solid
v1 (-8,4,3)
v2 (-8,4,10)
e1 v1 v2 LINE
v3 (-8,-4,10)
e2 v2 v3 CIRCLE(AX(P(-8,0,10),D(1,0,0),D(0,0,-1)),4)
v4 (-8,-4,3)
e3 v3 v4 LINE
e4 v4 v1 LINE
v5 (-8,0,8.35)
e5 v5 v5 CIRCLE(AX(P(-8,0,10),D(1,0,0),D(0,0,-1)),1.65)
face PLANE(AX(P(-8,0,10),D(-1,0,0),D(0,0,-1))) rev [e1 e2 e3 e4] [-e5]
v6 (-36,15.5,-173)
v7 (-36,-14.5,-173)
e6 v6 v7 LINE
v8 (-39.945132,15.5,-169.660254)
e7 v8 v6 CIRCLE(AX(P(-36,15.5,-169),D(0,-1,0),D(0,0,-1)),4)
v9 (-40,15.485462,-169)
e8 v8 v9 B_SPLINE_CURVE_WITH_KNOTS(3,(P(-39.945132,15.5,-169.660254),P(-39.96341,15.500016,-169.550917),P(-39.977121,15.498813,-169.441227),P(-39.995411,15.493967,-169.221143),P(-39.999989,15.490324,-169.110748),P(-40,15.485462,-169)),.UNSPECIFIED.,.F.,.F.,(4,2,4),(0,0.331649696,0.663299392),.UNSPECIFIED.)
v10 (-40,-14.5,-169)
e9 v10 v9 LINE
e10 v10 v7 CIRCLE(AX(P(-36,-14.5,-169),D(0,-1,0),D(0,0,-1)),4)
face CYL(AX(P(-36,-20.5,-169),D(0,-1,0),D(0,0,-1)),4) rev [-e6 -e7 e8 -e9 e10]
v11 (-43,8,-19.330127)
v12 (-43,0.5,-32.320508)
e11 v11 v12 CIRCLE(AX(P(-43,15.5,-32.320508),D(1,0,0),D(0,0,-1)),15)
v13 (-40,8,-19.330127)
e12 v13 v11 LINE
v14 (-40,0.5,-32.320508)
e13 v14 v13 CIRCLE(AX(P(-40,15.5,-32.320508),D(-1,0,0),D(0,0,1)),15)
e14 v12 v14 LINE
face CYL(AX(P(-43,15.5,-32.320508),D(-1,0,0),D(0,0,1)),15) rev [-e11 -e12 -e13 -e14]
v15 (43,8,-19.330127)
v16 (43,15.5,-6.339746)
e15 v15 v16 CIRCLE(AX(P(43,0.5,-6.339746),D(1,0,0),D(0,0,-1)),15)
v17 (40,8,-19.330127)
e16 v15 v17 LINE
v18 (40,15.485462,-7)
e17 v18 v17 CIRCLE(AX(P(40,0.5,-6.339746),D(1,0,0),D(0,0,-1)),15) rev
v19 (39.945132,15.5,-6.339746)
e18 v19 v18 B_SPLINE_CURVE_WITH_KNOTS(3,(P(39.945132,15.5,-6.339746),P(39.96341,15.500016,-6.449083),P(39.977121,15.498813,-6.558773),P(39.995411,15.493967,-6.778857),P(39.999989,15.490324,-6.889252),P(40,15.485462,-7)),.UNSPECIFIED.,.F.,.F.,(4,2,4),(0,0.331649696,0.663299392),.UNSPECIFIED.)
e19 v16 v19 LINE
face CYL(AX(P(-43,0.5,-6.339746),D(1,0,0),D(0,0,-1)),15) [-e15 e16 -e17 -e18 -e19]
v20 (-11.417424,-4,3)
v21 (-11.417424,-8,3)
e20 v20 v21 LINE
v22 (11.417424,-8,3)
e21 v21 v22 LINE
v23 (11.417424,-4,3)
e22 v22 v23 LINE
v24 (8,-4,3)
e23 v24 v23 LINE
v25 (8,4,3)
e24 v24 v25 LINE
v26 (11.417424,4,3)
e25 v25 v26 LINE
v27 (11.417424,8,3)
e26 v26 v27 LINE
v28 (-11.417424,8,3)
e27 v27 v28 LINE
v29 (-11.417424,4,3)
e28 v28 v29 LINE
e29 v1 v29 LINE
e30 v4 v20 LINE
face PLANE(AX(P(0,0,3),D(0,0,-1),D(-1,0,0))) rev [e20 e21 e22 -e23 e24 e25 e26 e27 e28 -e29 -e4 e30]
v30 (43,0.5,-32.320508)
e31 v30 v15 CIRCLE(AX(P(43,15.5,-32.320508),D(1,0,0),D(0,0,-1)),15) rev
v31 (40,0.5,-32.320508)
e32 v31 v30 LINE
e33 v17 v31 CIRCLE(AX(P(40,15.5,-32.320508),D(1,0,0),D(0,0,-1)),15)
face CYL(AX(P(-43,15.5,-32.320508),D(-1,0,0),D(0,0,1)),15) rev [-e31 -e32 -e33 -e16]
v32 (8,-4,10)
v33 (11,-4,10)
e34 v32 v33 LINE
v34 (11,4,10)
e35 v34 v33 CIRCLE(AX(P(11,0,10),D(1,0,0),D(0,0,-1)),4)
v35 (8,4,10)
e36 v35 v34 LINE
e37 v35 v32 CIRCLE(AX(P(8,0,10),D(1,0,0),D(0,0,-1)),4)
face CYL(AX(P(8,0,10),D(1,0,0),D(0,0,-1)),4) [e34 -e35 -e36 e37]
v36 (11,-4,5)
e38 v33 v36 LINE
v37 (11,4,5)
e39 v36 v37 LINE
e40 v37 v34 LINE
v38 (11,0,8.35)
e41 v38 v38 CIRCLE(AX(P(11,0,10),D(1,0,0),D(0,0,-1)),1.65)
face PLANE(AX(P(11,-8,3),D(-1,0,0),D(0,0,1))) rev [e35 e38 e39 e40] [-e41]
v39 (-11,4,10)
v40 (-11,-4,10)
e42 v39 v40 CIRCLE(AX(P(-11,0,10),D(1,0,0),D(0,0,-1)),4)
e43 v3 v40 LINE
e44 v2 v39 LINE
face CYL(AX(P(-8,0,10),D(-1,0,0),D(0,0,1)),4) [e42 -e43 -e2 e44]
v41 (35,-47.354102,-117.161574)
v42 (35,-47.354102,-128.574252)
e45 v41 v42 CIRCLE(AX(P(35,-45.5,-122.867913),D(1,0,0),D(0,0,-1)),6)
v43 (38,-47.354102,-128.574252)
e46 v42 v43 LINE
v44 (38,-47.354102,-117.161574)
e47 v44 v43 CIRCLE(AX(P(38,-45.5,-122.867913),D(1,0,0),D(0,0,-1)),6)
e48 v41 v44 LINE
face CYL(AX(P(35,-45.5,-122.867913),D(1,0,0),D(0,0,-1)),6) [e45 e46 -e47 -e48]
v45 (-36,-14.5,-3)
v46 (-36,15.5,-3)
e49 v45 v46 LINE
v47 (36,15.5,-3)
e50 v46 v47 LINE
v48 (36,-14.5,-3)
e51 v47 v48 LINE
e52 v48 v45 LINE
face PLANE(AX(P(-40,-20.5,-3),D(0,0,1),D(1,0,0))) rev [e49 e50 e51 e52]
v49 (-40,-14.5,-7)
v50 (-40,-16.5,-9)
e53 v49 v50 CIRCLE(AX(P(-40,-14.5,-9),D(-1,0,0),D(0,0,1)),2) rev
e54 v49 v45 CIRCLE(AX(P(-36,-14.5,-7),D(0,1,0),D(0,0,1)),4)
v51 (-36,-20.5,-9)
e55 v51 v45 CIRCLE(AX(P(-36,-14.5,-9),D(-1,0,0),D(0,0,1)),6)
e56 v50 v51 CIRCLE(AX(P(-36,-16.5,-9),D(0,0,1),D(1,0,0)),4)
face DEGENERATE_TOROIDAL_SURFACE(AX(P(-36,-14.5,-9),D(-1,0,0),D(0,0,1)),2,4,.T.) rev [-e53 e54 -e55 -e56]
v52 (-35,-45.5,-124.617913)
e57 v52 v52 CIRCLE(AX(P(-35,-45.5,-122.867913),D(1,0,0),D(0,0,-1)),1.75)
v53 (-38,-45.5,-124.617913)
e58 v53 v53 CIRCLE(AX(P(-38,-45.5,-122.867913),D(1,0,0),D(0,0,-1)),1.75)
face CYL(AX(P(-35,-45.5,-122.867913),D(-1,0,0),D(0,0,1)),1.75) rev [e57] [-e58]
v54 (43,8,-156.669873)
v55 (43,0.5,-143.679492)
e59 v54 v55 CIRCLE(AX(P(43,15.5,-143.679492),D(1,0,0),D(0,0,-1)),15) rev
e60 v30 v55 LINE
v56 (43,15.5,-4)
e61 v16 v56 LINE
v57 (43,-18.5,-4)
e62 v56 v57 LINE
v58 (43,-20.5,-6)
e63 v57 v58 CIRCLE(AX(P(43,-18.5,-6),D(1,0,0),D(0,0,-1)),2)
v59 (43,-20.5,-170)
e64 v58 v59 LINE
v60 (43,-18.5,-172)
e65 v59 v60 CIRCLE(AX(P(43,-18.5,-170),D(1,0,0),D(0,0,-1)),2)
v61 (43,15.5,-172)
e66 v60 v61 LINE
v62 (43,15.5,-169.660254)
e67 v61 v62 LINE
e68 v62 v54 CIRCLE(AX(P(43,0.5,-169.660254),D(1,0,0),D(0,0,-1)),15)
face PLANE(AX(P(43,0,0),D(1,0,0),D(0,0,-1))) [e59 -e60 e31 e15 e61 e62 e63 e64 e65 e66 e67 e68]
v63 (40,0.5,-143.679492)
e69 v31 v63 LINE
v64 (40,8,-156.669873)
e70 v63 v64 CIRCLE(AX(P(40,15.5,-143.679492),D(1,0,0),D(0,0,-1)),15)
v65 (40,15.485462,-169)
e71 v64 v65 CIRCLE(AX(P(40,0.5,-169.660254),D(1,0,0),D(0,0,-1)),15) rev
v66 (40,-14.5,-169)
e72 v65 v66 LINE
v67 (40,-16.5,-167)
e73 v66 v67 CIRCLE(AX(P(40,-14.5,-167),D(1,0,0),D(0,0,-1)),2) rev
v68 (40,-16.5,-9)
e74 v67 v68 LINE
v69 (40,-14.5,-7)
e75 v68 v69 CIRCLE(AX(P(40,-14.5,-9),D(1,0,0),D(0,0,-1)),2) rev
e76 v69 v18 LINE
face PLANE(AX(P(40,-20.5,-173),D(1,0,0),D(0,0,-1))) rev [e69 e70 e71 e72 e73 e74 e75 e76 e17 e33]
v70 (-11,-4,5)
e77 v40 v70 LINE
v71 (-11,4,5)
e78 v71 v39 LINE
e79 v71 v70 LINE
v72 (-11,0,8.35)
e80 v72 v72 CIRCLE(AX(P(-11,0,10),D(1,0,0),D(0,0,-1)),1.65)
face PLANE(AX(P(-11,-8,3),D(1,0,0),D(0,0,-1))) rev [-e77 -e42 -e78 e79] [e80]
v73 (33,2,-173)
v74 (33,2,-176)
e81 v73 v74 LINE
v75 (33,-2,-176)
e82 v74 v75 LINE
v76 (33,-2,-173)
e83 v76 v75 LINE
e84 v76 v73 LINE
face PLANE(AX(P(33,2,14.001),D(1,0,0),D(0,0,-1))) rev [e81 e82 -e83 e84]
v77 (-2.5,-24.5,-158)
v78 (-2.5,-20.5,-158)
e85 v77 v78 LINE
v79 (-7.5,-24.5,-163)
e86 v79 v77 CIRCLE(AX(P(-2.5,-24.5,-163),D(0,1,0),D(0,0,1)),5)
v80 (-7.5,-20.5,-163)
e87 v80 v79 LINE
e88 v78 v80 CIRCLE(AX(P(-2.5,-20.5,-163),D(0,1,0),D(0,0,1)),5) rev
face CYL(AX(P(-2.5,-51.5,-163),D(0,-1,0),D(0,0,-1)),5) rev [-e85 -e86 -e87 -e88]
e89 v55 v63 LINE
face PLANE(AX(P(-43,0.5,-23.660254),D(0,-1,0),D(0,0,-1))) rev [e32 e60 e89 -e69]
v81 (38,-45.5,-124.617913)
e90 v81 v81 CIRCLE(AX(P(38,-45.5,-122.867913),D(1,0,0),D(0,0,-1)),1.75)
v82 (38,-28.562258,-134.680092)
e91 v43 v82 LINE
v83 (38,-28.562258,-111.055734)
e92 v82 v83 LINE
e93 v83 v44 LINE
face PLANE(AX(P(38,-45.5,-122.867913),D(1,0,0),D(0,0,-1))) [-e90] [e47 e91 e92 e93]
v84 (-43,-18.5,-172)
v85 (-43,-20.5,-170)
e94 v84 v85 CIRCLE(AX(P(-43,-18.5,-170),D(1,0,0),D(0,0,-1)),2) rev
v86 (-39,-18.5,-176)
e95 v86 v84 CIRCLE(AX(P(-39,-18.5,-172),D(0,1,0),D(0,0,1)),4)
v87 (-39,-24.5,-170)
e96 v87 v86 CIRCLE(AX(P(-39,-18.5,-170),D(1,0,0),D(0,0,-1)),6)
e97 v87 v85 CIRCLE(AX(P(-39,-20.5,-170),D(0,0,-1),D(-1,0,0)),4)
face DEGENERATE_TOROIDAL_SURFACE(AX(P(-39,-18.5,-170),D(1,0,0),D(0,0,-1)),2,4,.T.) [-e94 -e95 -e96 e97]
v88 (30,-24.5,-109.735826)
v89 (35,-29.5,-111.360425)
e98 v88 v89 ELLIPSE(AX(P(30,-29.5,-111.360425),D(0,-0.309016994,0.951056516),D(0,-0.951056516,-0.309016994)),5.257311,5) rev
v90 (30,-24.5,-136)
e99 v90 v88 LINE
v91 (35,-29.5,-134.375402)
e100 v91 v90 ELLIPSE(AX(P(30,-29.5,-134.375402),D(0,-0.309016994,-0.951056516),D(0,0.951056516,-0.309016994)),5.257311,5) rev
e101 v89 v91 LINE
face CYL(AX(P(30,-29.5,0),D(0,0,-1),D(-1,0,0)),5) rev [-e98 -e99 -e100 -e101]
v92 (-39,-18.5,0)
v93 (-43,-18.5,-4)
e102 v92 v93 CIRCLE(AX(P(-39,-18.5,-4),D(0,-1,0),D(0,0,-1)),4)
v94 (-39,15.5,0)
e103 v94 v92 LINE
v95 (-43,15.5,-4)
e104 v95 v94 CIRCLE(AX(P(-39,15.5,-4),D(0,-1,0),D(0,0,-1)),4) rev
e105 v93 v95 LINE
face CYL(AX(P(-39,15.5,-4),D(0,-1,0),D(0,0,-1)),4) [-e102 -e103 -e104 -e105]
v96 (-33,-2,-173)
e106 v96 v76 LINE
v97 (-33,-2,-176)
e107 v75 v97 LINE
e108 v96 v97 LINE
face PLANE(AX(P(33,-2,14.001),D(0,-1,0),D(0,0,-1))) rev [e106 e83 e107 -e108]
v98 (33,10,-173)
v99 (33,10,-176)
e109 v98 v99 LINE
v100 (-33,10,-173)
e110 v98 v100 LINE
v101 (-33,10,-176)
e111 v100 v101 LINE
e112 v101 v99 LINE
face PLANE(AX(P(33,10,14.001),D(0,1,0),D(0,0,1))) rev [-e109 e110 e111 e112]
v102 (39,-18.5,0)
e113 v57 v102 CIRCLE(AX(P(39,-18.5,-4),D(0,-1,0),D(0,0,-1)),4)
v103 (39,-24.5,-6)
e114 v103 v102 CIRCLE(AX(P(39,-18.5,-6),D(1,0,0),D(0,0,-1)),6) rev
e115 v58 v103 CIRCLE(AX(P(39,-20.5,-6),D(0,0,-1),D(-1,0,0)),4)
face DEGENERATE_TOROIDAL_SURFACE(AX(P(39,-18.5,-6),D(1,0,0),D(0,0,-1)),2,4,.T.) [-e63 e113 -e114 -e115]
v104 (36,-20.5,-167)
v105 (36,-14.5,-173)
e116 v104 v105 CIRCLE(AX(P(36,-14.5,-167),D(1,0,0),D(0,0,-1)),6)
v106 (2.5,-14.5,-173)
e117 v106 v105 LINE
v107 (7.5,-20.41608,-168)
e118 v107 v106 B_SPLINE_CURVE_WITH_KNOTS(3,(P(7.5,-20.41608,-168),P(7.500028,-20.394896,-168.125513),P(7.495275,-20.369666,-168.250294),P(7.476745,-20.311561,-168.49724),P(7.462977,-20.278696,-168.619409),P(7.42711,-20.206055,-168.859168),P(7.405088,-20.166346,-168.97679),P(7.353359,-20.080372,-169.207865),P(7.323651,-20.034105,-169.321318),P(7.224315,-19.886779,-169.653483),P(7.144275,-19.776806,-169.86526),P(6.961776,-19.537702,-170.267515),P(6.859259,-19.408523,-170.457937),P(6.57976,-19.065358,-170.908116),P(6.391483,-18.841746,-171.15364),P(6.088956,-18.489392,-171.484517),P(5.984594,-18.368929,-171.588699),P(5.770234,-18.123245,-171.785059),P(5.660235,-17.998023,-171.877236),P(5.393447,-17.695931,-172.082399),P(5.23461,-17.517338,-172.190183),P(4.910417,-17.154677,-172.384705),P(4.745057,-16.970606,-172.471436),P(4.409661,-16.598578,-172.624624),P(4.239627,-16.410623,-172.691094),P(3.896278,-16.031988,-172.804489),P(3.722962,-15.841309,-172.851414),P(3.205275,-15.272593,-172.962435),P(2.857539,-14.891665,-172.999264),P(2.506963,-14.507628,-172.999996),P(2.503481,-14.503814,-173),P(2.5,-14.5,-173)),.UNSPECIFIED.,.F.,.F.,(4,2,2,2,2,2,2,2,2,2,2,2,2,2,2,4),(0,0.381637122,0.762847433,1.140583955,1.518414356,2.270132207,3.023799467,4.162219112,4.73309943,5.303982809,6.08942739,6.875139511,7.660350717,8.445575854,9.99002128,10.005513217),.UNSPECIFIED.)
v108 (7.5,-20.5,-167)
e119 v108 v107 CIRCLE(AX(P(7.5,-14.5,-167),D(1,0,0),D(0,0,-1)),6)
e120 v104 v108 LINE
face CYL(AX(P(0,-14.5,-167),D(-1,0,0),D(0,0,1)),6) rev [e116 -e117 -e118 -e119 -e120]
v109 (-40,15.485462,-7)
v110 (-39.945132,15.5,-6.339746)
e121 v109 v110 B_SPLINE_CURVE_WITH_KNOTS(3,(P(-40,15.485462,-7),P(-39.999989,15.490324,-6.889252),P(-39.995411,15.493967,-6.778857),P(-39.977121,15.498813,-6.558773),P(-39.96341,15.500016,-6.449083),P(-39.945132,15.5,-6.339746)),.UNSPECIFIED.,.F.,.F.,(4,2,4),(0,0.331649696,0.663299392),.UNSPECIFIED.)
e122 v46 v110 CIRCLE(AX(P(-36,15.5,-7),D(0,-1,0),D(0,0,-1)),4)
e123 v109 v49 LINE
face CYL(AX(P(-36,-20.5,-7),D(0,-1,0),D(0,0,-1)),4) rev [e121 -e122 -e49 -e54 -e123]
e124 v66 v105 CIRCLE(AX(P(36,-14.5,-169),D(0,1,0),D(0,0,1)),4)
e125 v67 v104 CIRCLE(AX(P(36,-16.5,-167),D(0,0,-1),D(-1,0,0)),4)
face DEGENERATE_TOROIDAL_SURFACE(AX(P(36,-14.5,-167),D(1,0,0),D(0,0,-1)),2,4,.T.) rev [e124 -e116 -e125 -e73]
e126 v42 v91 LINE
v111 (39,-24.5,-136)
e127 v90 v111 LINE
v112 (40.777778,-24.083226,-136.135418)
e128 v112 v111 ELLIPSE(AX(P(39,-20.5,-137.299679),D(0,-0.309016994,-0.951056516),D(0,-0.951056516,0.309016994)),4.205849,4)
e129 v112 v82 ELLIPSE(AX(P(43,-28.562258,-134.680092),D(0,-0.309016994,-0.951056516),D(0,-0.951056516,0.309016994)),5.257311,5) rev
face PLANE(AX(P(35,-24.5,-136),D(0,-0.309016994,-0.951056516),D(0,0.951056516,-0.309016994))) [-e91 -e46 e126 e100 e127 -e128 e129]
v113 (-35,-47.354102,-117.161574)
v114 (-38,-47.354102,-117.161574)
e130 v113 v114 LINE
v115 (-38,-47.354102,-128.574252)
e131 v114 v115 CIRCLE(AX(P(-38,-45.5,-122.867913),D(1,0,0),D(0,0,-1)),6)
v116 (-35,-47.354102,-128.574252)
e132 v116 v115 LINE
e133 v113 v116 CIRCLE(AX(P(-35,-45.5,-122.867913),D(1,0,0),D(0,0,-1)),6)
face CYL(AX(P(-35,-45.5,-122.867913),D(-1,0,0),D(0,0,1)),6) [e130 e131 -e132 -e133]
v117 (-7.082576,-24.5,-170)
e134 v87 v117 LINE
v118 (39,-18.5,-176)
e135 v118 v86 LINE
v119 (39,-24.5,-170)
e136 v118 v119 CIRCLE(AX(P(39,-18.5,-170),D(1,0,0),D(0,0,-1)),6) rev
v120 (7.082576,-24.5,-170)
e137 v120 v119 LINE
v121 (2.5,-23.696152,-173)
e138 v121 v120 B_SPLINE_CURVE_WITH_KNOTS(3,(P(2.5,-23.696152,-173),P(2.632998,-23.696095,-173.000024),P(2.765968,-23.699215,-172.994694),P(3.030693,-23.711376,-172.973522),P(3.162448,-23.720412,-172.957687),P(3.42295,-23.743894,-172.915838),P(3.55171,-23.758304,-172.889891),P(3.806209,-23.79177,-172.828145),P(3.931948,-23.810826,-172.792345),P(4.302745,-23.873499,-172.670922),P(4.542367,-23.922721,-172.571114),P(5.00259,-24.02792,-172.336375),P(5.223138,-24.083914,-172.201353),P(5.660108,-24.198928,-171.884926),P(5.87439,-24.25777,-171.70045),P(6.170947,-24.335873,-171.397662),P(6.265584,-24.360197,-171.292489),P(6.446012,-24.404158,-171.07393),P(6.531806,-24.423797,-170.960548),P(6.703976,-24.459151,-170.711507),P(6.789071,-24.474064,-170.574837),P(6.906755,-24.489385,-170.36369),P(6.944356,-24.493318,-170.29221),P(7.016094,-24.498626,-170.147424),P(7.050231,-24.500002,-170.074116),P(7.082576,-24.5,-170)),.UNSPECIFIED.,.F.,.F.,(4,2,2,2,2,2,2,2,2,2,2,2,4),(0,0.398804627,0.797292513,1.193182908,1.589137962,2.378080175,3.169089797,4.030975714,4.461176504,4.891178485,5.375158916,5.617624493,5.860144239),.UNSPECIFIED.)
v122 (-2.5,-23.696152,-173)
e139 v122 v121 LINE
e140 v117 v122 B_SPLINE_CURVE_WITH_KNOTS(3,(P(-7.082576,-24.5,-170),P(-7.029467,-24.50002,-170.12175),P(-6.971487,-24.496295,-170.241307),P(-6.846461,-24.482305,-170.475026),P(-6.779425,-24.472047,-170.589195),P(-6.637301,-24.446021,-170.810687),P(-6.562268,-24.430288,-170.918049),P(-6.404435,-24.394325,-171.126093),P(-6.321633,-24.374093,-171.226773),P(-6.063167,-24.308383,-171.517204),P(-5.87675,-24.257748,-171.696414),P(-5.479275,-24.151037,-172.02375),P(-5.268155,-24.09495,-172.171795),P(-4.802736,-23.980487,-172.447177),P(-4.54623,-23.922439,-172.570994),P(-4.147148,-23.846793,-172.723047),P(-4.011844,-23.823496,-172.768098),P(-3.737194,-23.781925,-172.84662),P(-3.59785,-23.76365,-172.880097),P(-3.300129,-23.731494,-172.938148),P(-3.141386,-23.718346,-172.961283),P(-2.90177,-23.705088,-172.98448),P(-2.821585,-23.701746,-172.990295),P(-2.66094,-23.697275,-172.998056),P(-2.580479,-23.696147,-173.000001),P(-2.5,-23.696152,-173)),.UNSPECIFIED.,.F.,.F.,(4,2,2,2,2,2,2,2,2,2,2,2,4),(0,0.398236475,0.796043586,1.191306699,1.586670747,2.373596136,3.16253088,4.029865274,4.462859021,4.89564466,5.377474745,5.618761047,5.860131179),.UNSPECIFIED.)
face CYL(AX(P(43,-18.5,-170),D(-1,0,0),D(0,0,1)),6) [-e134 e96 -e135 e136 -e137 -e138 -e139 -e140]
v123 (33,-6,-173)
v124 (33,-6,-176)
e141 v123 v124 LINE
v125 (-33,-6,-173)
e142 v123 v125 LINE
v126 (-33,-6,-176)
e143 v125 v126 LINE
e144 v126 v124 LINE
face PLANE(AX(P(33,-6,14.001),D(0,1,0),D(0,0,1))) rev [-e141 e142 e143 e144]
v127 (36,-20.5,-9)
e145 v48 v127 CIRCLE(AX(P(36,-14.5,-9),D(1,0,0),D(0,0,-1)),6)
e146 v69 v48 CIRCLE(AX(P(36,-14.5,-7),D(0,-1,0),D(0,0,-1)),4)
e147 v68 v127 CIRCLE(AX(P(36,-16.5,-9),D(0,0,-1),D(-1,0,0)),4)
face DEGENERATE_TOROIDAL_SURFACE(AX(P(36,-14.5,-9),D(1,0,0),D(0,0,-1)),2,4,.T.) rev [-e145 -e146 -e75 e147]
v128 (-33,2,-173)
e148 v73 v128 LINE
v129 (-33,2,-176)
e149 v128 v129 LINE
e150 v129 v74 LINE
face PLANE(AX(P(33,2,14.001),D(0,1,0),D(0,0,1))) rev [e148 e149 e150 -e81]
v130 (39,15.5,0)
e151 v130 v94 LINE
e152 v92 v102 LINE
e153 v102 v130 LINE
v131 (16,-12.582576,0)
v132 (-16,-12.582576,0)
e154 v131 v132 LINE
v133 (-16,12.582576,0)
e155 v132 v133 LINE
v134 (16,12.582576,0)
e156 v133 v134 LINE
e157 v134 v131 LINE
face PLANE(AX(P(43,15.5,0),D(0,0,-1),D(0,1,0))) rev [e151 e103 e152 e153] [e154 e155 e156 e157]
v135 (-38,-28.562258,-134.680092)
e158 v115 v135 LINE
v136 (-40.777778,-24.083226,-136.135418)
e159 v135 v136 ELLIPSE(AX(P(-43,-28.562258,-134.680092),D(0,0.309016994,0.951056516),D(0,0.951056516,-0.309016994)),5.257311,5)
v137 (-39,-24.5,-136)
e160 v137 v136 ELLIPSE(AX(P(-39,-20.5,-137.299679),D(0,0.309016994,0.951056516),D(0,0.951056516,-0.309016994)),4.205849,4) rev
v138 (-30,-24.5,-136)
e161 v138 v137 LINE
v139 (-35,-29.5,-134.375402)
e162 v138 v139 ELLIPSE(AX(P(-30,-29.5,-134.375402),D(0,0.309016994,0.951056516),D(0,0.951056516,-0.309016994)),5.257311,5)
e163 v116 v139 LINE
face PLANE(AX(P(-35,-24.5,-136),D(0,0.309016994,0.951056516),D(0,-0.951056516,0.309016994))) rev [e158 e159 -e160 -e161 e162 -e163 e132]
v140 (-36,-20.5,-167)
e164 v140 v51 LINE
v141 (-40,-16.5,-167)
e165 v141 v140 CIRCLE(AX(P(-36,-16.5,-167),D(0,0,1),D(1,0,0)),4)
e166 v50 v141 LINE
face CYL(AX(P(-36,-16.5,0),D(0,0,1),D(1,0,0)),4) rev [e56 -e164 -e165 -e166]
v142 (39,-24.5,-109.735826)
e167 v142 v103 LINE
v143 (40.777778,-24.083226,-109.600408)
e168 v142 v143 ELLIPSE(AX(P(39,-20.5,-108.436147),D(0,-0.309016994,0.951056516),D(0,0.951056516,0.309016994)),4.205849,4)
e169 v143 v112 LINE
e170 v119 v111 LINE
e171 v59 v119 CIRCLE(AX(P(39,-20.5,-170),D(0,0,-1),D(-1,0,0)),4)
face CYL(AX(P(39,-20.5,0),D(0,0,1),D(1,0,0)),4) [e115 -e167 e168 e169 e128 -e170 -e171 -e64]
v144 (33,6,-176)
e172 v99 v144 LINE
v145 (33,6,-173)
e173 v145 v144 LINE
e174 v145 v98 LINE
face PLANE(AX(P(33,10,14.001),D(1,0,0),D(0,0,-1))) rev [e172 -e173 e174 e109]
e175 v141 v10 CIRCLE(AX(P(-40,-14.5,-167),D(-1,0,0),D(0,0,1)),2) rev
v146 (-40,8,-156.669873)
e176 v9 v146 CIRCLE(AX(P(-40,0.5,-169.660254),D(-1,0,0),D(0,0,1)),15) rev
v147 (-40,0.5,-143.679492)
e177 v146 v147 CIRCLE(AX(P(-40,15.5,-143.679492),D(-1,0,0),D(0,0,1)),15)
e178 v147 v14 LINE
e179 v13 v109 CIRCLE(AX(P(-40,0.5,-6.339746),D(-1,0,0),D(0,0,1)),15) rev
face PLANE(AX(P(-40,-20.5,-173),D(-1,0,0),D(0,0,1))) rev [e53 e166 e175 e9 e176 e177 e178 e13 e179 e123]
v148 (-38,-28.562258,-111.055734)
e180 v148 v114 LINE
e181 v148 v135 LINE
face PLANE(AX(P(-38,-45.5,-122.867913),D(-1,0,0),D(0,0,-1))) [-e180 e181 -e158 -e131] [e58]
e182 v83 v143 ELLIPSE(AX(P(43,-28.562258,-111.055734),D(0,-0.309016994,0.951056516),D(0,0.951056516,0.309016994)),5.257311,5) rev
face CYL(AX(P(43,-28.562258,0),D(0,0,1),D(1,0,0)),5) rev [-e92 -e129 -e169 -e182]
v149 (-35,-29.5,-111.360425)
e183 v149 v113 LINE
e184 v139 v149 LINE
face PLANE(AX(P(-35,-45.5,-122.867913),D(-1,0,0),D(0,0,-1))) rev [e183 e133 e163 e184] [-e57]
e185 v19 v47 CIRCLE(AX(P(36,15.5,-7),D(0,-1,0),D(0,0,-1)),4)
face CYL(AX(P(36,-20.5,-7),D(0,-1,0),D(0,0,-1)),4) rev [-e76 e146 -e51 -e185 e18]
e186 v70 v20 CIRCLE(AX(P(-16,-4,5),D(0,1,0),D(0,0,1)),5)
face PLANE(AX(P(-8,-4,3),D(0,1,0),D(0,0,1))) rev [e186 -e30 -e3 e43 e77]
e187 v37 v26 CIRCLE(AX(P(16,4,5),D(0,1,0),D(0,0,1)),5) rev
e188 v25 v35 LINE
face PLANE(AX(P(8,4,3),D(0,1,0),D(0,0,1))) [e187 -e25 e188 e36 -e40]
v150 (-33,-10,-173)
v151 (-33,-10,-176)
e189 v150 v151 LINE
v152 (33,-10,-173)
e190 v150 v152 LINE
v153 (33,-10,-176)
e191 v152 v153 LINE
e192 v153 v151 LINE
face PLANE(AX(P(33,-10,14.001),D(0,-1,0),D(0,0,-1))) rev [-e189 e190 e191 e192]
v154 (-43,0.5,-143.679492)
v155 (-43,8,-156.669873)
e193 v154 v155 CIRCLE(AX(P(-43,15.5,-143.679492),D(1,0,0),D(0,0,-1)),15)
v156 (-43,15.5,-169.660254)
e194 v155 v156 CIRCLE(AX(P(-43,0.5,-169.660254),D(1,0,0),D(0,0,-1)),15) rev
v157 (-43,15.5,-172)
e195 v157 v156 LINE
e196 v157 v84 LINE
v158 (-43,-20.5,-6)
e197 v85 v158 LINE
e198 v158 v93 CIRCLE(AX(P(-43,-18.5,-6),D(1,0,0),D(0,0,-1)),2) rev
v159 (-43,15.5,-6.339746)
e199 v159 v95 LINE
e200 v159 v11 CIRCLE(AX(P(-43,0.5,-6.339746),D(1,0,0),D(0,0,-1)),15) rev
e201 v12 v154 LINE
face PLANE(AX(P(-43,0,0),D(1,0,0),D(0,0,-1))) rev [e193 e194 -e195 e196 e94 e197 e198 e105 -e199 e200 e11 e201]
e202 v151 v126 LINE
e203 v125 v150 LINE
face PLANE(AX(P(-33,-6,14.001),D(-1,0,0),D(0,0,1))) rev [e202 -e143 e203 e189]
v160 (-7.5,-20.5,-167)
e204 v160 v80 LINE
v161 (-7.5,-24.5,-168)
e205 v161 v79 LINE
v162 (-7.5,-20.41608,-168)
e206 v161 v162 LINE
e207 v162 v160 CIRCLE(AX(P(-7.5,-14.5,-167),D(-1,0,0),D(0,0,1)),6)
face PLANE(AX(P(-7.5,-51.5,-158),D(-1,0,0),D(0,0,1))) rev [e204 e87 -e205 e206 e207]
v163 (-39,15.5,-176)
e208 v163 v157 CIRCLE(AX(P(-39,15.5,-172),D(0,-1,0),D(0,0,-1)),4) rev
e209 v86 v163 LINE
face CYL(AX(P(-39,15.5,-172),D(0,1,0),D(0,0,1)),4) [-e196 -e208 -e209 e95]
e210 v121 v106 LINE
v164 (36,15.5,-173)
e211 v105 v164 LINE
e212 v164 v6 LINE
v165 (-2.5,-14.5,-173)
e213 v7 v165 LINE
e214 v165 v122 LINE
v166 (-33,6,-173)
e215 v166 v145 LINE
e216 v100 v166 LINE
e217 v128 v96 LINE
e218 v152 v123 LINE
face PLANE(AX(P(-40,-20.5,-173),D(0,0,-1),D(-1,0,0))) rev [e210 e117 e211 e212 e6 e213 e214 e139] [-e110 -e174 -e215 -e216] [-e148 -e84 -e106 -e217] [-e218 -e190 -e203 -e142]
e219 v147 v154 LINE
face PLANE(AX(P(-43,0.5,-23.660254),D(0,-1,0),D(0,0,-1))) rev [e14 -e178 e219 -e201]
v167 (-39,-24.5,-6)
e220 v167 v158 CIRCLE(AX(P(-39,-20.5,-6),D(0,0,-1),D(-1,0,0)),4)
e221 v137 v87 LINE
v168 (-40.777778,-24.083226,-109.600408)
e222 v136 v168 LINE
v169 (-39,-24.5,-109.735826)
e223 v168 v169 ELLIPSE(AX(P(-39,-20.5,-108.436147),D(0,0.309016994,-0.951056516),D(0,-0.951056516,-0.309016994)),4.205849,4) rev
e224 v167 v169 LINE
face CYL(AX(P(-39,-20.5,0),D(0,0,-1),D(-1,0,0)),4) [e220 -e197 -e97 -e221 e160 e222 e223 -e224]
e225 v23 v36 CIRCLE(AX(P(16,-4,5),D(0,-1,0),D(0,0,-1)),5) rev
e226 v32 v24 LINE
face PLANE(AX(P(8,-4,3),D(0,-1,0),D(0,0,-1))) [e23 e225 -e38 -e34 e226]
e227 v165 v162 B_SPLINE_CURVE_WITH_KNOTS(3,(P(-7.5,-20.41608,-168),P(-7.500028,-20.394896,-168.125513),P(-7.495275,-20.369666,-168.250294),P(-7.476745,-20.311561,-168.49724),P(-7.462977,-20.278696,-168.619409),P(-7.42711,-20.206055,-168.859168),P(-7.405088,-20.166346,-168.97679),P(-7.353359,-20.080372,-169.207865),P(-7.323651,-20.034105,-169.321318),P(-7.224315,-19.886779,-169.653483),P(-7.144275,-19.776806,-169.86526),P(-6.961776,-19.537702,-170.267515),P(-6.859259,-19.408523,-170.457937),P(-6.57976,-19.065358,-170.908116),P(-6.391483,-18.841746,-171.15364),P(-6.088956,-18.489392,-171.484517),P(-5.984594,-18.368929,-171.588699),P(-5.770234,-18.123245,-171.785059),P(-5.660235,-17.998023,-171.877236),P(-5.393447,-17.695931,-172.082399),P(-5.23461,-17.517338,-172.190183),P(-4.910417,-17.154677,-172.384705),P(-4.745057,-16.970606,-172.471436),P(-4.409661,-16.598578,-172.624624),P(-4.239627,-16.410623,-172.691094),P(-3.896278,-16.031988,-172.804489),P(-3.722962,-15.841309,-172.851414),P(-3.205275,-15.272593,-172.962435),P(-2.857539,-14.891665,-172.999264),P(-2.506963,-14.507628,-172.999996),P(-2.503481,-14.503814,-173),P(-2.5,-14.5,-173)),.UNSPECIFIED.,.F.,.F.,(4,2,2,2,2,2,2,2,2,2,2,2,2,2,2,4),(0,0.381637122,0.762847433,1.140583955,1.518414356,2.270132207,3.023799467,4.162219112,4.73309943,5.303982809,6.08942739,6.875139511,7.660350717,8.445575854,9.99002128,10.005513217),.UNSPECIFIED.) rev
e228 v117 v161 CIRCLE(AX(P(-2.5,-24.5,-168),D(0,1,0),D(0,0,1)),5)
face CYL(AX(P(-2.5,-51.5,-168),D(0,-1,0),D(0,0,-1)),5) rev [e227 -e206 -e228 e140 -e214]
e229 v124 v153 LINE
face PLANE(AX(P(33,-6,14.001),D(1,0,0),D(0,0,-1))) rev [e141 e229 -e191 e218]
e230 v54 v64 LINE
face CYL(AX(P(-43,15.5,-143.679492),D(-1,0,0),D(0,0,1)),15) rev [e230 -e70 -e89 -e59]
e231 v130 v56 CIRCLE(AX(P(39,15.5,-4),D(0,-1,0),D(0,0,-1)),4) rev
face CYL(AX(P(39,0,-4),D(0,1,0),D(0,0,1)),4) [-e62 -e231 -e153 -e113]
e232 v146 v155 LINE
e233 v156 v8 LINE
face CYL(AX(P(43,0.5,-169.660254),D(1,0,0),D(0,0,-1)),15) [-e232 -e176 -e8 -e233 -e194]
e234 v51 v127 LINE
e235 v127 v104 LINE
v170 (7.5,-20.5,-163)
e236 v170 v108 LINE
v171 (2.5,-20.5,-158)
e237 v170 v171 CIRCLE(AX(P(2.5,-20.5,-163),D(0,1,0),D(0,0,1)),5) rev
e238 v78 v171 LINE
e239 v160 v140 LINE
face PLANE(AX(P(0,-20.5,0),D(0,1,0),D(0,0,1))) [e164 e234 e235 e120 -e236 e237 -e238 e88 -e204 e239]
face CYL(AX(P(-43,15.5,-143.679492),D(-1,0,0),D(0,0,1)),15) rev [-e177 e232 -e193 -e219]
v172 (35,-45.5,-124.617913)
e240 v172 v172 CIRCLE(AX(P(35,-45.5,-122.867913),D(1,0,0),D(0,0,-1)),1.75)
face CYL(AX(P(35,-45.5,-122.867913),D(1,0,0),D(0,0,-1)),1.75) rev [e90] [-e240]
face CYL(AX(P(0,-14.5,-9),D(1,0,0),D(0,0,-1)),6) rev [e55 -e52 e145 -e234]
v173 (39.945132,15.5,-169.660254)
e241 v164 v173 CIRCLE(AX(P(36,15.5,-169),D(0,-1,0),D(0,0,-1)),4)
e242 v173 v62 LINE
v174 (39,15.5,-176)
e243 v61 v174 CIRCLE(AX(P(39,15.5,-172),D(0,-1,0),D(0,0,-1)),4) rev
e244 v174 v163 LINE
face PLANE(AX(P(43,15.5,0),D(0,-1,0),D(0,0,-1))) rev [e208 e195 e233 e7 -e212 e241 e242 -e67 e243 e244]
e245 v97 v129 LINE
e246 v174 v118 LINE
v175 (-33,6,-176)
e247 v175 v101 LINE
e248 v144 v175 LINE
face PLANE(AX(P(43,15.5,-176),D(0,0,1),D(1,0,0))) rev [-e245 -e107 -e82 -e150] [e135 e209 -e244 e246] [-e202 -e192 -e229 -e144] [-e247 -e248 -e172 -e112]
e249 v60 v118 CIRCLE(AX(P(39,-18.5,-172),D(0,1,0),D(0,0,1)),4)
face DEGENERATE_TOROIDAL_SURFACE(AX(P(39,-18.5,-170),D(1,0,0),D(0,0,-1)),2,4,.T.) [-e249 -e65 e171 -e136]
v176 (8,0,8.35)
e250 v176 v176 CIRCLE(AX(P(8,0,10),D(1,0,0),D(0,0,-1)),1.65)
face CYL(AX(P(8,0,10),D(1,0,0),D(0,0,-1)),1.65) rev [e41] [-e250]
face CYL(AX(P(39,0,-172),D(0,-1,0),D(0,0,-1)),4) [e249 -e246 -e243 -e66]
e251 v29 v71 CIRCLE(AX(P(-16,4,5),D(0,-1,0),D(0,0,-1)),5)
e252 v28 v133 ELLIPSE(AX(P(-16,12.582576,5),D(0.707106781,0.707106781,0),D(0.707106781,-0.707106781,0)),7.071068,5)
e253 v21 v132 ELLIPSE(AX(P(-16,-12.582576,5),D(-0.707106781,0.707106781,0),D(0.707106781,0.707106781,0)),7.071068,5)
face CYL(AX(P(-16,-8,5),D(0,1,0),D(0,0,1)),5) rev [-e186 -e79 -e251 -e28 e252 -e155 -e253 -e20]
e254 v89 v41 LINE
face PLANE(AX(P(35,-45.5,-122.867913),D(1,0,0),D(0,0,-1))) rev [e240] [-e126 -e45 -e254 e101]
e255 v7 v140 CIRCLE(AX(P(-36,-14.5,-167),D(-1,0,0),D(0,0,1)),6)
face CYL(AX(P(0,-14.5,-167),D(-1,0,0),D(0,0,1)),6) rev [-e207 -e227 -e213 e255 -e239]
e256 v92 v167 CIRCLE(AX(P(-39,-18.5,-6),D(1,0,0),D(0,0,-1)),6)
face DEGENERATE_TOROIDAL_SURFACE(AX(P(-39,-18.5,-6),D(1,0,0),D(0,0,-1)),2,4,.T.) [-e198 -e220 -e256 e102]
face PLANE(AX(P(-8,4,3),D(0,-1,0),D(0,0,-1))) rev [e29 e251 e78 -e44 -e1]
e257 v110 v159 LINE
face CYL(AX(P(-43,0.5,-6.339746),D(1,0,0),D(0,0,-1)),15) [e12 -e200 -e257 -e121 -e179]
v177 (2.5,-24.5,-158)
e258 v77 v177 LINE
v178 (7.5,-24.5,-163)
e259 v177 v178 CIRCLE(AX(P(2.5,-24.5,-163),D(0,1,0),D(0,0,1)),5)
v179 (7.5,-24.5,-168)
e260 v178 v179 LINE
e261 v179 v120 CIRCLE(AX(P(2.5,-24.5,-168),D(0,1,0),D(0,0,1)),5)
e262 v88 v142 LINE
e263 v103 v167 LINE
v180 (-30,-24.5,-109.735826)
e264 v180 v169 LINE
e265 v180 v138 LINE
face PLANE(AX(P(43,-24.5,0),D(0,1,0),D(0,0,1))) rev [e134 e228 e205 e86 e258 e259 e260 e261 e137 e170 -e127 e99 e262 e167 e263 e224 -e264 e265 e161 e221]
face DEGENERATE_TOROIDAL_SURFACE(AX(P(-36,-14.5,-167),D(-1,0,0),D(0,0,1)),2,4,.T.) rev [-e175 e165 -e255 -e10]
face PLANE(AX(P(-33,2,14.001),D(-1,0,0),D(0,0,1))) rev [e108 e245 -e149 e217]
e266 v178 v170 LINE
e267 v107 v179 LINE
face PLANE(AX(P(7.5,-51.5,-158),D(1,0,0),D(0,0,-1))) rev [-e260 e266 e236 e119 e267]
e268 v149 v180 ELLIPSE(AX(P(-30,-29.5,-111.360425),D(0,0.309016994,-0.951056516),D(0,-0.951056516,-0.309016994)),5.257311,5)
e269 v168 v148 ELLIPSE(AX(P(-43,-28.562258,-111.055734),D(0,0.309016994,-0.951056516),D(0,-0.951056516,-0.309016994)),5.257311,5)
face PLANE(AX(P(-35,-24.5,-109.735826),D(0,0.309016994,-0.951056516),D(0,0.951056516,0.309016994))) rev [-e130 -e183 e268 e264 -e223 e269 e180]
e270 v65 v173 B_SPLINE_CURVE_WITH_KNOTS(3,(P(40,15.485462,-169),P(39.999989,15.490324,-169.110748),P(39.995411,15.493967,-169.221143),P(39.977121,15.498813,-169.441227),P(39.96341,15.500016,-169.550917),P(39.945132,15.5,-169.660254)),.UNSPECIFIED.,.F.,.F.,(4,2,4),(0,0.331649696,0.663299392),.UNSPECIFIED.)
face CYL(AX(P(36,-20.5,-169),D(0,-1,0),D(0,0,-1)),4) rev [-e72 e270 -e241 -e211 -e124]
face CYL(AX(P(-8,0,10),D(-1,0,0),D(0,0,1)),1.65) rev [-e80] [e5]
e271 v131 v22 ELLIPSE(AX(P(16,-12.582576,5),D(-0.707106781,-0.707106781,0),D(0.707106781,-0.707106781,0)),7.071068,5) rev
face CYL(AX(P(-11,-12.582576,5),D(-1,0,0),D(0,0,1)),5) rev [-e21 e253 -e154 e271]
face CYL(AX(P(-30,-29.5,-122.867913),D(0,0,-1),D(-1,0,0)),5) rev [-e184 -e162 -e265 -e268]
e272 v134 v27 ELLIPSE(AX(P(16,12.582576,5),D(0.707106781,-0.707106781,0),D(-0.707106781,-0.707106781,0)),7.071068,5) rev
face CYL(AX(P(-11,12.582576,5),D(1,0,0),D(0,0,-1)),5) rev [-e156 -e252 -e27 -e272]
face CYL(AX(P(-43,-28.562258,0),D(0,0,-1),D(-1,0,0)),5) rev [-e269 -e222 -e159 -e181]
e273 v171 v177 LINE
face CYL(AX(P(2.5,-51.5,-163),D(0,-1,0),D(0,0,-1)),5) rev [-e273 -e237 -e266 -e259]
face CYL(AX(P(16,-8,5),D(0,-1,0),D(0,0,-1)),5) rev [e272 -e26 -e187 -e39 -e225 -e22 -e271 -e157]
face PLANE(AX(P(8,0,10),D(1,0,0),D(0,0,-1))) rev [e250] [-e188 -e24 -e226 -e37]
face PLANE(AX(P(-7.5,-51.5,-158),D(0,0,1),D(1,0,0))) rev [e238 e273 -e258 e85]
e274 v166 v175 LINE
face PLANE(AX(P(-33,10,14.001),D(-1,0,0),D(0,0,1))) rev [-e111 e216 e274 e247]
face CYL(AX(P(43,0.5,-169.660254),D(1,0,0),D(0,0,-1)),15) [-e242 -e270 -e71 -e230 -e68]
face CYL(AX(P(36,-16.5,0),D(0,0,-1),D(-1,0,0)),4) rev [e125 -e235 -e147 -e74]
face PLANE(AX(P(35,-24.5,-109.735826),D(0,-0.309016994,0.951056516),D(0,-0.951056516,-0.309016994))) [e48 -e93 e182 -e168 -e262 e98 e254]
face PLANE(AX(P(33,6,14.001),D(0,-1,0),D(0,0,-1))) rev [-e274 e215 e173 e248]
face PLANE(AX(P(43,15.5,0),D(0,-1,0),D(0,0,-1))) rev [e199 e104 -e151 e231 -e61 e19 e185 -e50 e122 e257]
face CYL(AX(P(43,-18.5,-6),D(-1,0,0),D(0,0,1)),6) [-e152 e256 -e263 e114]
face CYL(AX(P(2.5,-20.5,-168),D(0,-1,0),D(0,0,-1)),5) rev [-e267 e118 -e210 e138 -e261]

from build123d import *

# Parameters (mm, degrees)
SKETCH_1_W          = 22
SKETCH_1_H          = 16
EXTRUDE_1_DEPTH     = 3
SKETCH_2_R          = 1.65
EXTRUDE_2_DEPTH     = 3
SKETCH_3_W          = 176
SKETCH_3_H          = 40
EXTRUDE_3_DEPTH     = 43
SKETCH_4_W          = 80
SKETCH_4_H          = 170
CUT_EXTRUDE_1_DEPTH = 36
EXTRUDE_START       = -5
SKETCH_5_R          = 1.75
EXTRUDE_4_DEPTH     = 3
FILLET_1_R          = 5
CUT_EXTRUDE_2_DEPTH = 203.544439568
SKETCH_7_W          = 15
SKETCH_7_H          = 15
CUT_EXTRUDE_3_DEPTH = 185.718705063
FILLET_2_R          = 5
FILLET_3_R          = 6
FILLET_4_R          = 6
FILLET_5_R          = 6
FILLET_6_R          = 6
FILLET_7_R          = 4
FILLET_8_R          = 4
FILLET_START        = -44
FILLET_10_DEPTH     = 88
FILLET_START_2      = -43
FILLET_10_2_DEPTH   = 3
FILLET_START_3      = 40
FILLET_10_3_DEPTH   = 3
FILLET_11_R         = 5
FILLET_12_R         = 5
FILLET_13_R         = 5
CUT_EXTRUDE_5_REACH = 203.498
SKETCH_9_W          = 66
SKETCH_9_H          = 4


with BuildPart() as part:
    # 草图1 → 凸台-拉伸1 (new body)
    with BuildSketch(Plane.XY):
        Rectangle(SKETCH_1_W, SKETCH_1_H)
    extrude(amount=EXTRUDE_1_DEPTH)

    # 草图2 → 凸台-拉伸2 (add)
    with BuildSketch(Plane(origin=(11, 0, 0), x_dir=(0, 0, -1), z_dir=(1, 0, 0))):
        with BuildLine():
            Line((-3, -4), (-10, -4))
            ThreePointArc((-10, -4), (-14, 0), (-10, 4))
            Line((-10, 4), (-3, 4))
            Line((-3, 4), (-3, -4))
        make_face()
        with Locations((-10, 0)):
            Circle(SKETCH_2_R, mode=Mode.SUBTRACT)
    extrude_2 = extrude(amount=-EXTRUDE_2_DEPTH)

    # 镜向1: 凸台-拉伸2 across plane
    add(extrude_2.mirror(Plane(origin=(0, 0, 0), x_dir=(0, 0, 1), z_dir=(1, 0, 0))))

    # 草图3 → 凸台-拉伸3 (add, symmetric)
    with BuildSketch(Plane(origin=(0, 0, 0), x_dir=(0, 0, -1), z_dir=(1, 0, 0))):
        with Locations((88, -4.5)):
            Rectangle(SKETCH_3_W, SKETCH_3_H)
    extrude(amount=EXTRUDE_3_DEPTH, both=True)

    # 草图4 → 切除-拉伸1 (cut)
    with BuildSketch(Plane(origin=(0, 15.5, 0), x_dir=(1, 0, 0), z_dir=(0, 1, 0))):
        with Locations((0, 88)):
            Rectangle(SKETCH_4_W, SKETCH_4_H)
    extrude(amount=-CUT_EXTRUDE_1_DEPTH, mode=Mode.SUBTRACT)

    # 草图5 → 凸台-拉伸4 (add)
    with BuildSketch(Plane(origin=(43, 0, 0), x_dir=(0, 0, -1), z_dir=(1, 0, 0)).offset(EXTRUDE_START)):
        with BuildLine():
            Line((109.735826067, -24.5), (117.161573936, -47.354101966))
            ThreePointArc((117.161573936, -47.354101966), (122.867913034, -51.5), (128.574252131, -47.354101966))
            Line((128.574252131, -47.354101966), (136, -24.5))
            Line((136, -24.5), (109.735826067, -24.5))
        make_face()
        with Locations((122.867913034, -45.5)):
            Circle(SKETCH_5_R, mode=Mode.SUBTRACT)
    extrude_4 = extrude(amount=-EXTRUDE_4_DEPTH)

    # 镜向2: 凸台-拉伸4 across plane
    add(extrude_4.mirror(Plane(origin=(0, 0, 0), x_dir=(0, 0, 1), z_dir=(1, 0, 0))))

    # 圆角1
    fillet_1_edges = [part.edges().sort_by_distance(p)[0] for p in [
        (35, -24.5, -122.867913034),
        (-35, -24.5, -122.867913034),
    ]]
    fillet(fillet_1_edges, radius=FILLET_1_R)

    # 草图6 → 切除-拉伸2 (cut, through all)
    with BuildSketch(Plane(origin=(43, 0, 0), x_dir=(0, 0, -1), z_dir=(1, 0, 0))):
        Polygon((15, 15.5), (23.660254038, 0.5), (152.339745962, 0.5), (161, 15.5), align=None)
    extrude(amount=-CUT_EXTRUDE_2_DEPTH, mode=Mode.SUBTRACT)

    # 草图7 → 切除-拉伸3 (cut, through all)
    with BuildSketch(Plane(origin=(0, -20.5, 0), x_dir=(1, 0, 0), z_dir=(0, 1, 0))):
        with Locations((0, 165.5)):
            Rectangle(SKETCH_7_W, SKETCH_7_H)
    extrude(amount=-CUT_EXTRUDE_3_DEPTH, mode=Mode.SUBTRACT)

    # 圆角2
    fillet_2_edges = [part.edges().sort_by_distance(p)[0] for p in [
        (7.5, -22.5, -173),
        (7.5, -22.5, -158),
        (-7.5, -22.5, -158),
        (-7.5, -22.5, -173),
    ]]
    fillet(fillet_2_edges, radius=FILLET_2_R)

    # 圆角3
    fillet_3_edges = [part.edges().sort_by_distance(p)[0] for p in [
        (0, -24.5, 0),
    ]]
    fillet(fillet_3_edges, radius=FILLET_3_R)

    # 圆角4
    fillet_4_edges = [part.edges().sort_by_distance(p)[0] for p in [
        (0, -20.5, -3),
    ]]
    fillet(fillet_4_edges, radius=FILLET_4_R)

    # 圆角5
    fillet_5_edges = [part.edges().sort_by_distance(p)[0] for p in [
        (21.25, -20.5, -173),
        (-21.25, -20.5, -173),
    ]]
    fillet(fillet_5_edges, radius=FILLET_5_R)

    # 圆角6
    # the kernel refuses this fillet: 6 mm, written as the material it takes off along each edge
    with BuildSketch(Plane(origin=(58, -24.5, -176), x_dir=(0, 0, 1), z_dir=(-1, 0, 0))) as fillet_6_piece_1:
        with BuildLine():
            CenterArc((FILLET_6_R, FILLET_6_R), FILLET_6_R, 180, 90)
            Line((0, FILLET_6_R), (0, 0))
            Line((0, 0), (FILLET_6_R, 0))
        make_face()
    extrude(amount=116, mode=Mode.SUBTRACT)

    # 圆角7
    fillet_7_edges = [part.edges().sort_by_distance(p)[0] for p in [
        (-43, -24.5, -88),
        (43, -24.5, -88),
        (-43, -22.742640687, -1.757359313),
        (43, -22.742640687, -1.757359313),
        (-43, -1.5, -176),
        (43, -1.5, -176),
        (-43, -22.742640687, -174.242640687),
        (43, -22.742640687, -174.242640687),
        (-43, -1.5, 0),
        (43, -1.5, 0),
    ]]
    fillet(fillet_7_edges, radius=FILLET_7_R)

    # 圆角8
    fillet_8_edges = [part.edges().sort_by_distance(p)[0] for p in [
        (40, -20.5, -88),
        (40, 0.5, -3),
        (40, -18.742640687, -4.757359313),
        (-40, 0.5, -3),
        (-40, -18.742640687, -4.757359313),
        (-40, -20.5, -88),
        (40, 0.5, -173),
        (-40, 0.5, -173),
        (40, -18.742640687, -171.242640687),
        (-40, -18.742640687, -171.242640687),
    ]]
    fillet(fillet_8_edges, radius=FILLET_8_R)

    # 圆角10: read off the stored shape, not the designer's step
    # 圆角10 outline → 圆角10 (cut)
    with BuildSketch(Plane.YZ.offset(FILLET_START)):
        with BuildLine():
            Line((15.5, -161), (8, -156.669872981))
            ThreePointArc((8, -156.669872981), (13.490381057, -162.160254038), (15.5, -169.660254038))
            Line((15.5, -169.660254038), (15.5, -161))
        make_face()
        with BuildLine():
            ThreePointArc((15.5, -6.339745962), (13.490381057, -13.839745962), (8, -19.330127019))
            Line((8, -19.330127019), (15.5, -15))
            Line((15.5, -15), (15.5, -6.339745962))
        make_face()
    extrude(amount=FILLET_10_DEPTH, mode=Mode.SUBTRACT)

    # Fillet 10 2 outline → Fillet 10 2 (add)
    with BuildSketch(Plane.YZ.offset(FILLET_START_2)):
        with BuildLine():
            Line((0.5, -23.660254038), (0.5, -32.320508076))
            ThreePointArc((0.5, -32.320508076), (2.509618943, -24.820508076), (8, -19.330127019))
            Line((8, -19.330127019), (0.5, -23.660254038))
        make_face()
        with BuildLine():
            ThreePointArc((8, -156.669872981), (2.509618943, -151.179491924), (0.5, -143.679491924))
            Line((0.5, -143.679491924), (0.5, -152.339745962))
            Line((0.5, -152.339745962), (8, -156.669872981))
        make_face()
    extrude(amount=FILLET_10_2_DEPTH)

    # Fillet 10 3 outline → Fillet 10 3 (add)
    with BuildSketch(Plane.YZ.offset(FILLET_START_3)):
        with BuildLine():
            Line((0.5, -23.660254038), (0.5, -32.320508076))
            ThreePointArc((0.5, -32.320508076), (2.509618943, -24.820508076), (8, -19.330127019))
            Line((8, -19.330127019), (0.5, -23.660254038))
        make_face()
        with BuildLine():
            ThreePointArc((8, -156.669872981), (2.509618943, -151.179491924), (0.5, -143.679491924))
            Line((0.5, -143.679491924), (0.5, -152.339745962))
            Line((0.5, -152.339745962), (8, -156.669872981))
        make_face()
    extrude(amount=FILLET_10_3_DEPTH)

    # 圆角11
    # the kernel refuses this fillet: 5 mm, written as the material it adds along each edge
    with BuildSketch(Plane(origin=(-11, -8, 0), x_dir=(0, -1, 0), z_dir=(1, 0, 0)), Plane(origin=(11, 8, 0), x_dir=(0, 1, 0), z_dir=(-1, 0, 0))) as fillet_11_piece_1:
        with BuildLine():
            CenterArc((4.582575695, -5), FILLET_11_R, 90, 66.421821522)
            Line((0, -3), (0, 0))
            Line((0, 0), (4.582575695, 0))
        make_face()
    extrude(amount=22)
    with BuildSketch(Plane(origin=(-11, 8, 0), x_dir=(-1, 0, 0), z_dir=(0, -1, 0))) as fillet_11_piece_2_section:
        with BuildLine():
            CenterArc((FILLET_11_R, -FILLET_11_R), FILLET_11_R, 90, 90)
            Line((0, -FILLET_11_R), (0, 0))
            Line((0, 0), (FILLET_11_R, 0))
        make_face()
    fillet_11_piece_2 = extrude(amount=16, mode=Mode.PRIVATE)
    fillet_11_piece_2 = split(fillet_11_piece_2, bisect_by=Plane(origin=(-11, 8, 3), z_dir=(0, 0, -1)), keep=Keep.TOP, mode=Mode.PRIVATE)
    add(fillet_11_piece_2)
    with BuildSketch(Plane(origin=(-11, 20.5, 0), x_dir=(-1, 0, 0), z_dir=(0, -1, 0))) as fillet_11_piece_3_section:
        with BuildLine():
            CenterArc((FILLET_11_R, -FILLET_11_R), FILLET_11_R, 90, 90)
            Line((0, -FILLET_11_R), (0, 0))
            Line((0, 0), (FILLET_11_R, 0))
        make_face()
    fillet_11_piece_3 = extrude(amount=41, mode=Mode.PRIVATE)
    fillet_11_piece_3 = split(fillet_11_piece_3, bisect_by=Plane(origin=(-11, 4, 0), z_dir=(0, -1, 0)), keep=Keep.TOP, mode=Mode.PRIVATE)
    fillet_11_piece_3 = split(fillet_11_piece_3, bisect_by=Plane(origin=(-11, -4, 0), z_dir=(0, 1, 0)), keep=Keep.TOP, mode=Mode.PRIVATE)
    add(fillet_11_piece_3)
    with BuildSketch(Plane(origin=(11, -8, 0), x_dir=(1, 0, 0), z_dir=(0, 1, 0))) as fillet_11_piece_4_section:
        with BuildLine():
            CenterArc((FILLET_11_R, -FILLET_11_R), FILLET_11_R, 90, 90)
            Line((0, -FILLET_11_R), (0, 0))
            Line((0, 0), (FILLET_11_R, 0))
        make_face()
    fillet_11_piece_4 = extrude(amount=16, mode=Mode.PRIVATE)
    fillet_11_piece_4 = split(fillet_11_piece_4, bisect_by=Plane(origin=(11, -8, 3), z_dir=(0, 0, -1)), keep=Keep.TOP, mode=Mode.PRIVATE)
    add(fillet_11_piece_4)
    with BuildSketch(Plane(origin=(11, -20.5, 0), x_dir=(1, 0, 0), z_dir=(0, 1, 0))) as fillet_11_piece_5_section:
        with BuildLine():
            CenterArc((FILLET_11_R, -FILLET_11_R), FILLET_11_R, 90, 90)
            Line((0, -FILLET_11_R), (0, 0))
            Line((0, 0), (FILLET_11_R, 0))
        make_face()
    fillet_11_piece_5 = extrude(amount=41, mode=Mode.PRIVATE)
    fillet_11_piece_5 = split(fillet_11_piece_5, bisect_by=Plane(origin=(11, -4, 0), z_dir=(0, 1, 0)), keep=Keep.TOP, mode=Mode.PRIVATE)
    fillet_11_piece_5 = split(fillet_11_piece_5, bisect_by=Plane(origin=(11, 4, 0), z_dir=(0, -1, 0)), keep=Keep.TOP, mode=Mode.PRIVATE)
    add(fillet_11_piece_5)
    with BuildSketch(Plane(origin=(-11, 8, 0), x_dir=(-1, 0, 0), z_dir=(0, -1, 0))) as fillet_11_piece_6a_section:
        with BuildLine():
            CenterArc((FILLET_11_R, -FILLET_11_R), FILLET_11_R, 90, 90)
            Line((0, -FILLET_11_R), (0, 0))
            Line((0, 0), (FILLET_11_R, 0))
        make_face()
    fillet_11_piece_6a = extrude(amount=28.5, mode=Mode.PRIVATE)
    fillet_11_piece_6a = split(fillet_11_piece_6a, bisect_by=Plane(origin=(-11, -8, 0), z_dir=(0, -1, 0)), keep=Keep.TOP, mode=Mode.PRIVATE)
    fillet_11_piece_6a = split(fillet_11_piece_6a, bisect_by=Plane(origin=(-11, 8, 3), z_dir=(0, 0, -1)), keep=Keep.TOP, mode=Mode.PRIVATE)
    with BuildSketch(Plane(origin=(-22.456439237, -8, 0), x_dir=(0, -1, 0), z_dir=(1, 0, 0))) as fillet_11_piece_6b_section:
        with BuildLine():
            CenterArc((4.582575695, -5), FILLET_11_R, 90, 66.421821522)
            Line((0, -3), (0, 0))
            Line((0, 0), (4.582575695, 0))
        make_face()
    fillet_11_piece_6b = extrude(amount=33.456439237, mode=Mode.PRIVATE)
    fillet_11_piece_6b = split(fillet_11_piece_6b, bisect_by=Plane(origin=(-11, -8, 0), z_dir=(-1, 0, 0)), keep=Keep.TOP, mode=Mode.PRIVATE)
    fillet_11_piece_6 = fillet_11_piece_6a & fillet_11_piece_6b
    add(fillet_11_piece_6)
    with BuildSketch(Plane(origin=(11, -20.5, 0), x_dir=(1, 0, 0), z_dir=(0, 1, 0))) as fillet_11_piece_7a_section:
        with BuildLine():
            CenterArc((FILLET_11_R, -FILLET_11_R), FILLET_11_R, 90, 90)
            Line((0, -FILLET_11_R), (0, 0))
            Line((0, 0), (FILLET_11_R, 0))
        make_face()
    fillet_11_piece_7a = extrude(amount=28.5, mode=Mode.PRIVATE)
    fillet_11_piece_7a = split(fillet_11_piece_7a, bisect_by=Plane(origin=(11, -8, 0), z_dir=(0, -1, 0)), keep=Keep.TOP, mode=Mode.PRIVATE)
    fillet_11_piece_7a = split(fillet_11_piece_7a, bisect_by=Plane(origin=(11, -20.5, 3), z_dir=(0, 0, -1)), keep=Keep.TOP, mode=Mode.PRIVATE)
    with BuildSketch(Plane(origin=(-11, -8, 0), x_dir=(0, -1, 0), z_dir=(1, 0, 0))) as fillet_11_piece_7b_section:
        with BuildLine():
            CenterArc((4.582575695, -5), FILLET_11_R, 90, 66.421821522)
            Line((0, -3), (0, 0))
            Line((0, 0), (4.582575695, 0))
        make_face()
    fillet_11_piece_7b = extrude(amount=33.456439237, mode=Mode.PRIVATE)
    fillet_11_piece_7b = split(fillet_11_piece_7b, bisect_by=Plane(origin=(11, -8, 0), z_dir=(1, 0, 0)), keep=Keep.TOP, mode=Mode.PRIVATE)
    fillet_11_piece_7 = fillet_11_piece_7a & fillet_11_piece_7b
    add(fillet_11_piece_7)
    with BuildSketch(Plane(origin=(-11, 20.5, 0), x_dir=(-1, 0, 0), z_dir=(0, -1, 0))) as fillet_11_piece_8a_section:
        with BuildLine():
            CenterArc((FILLET_11_R, -FILLET_11_R), FILLET_11_R, 90, 90)
            Line((0, -FILLET_11_R), (0, 0))
            Line((0, 0), (FILLET_11_R, 0))
        make_face()
    fillet_11_piece_8a = extrude(amount=28.5, mode=Mode.PRIVATE)
    fillet_11_piece_8a = split(fillet_11_piece_8a, bisect_by=Plane(origin=(-11, 15.5, 0), z_dir=(0, -1, 0)), keep=Keep.TOP, mode=Mode.PRIVATE)
    fillet_11_piece_8a = split(fillet_11_piece_8a, bisect_by=Plane(origin=(-11, 8, 0), z_dir=(0, 1, 0)), keep=Keep.TOP, mode=Mode.PRIVATE)
    fillet_11_piece_8a = split(fillet_11_piece_8a, bisect_by=Plane(origin=(-11, 20.5, 3), z_dir=(0, 0, -1)), keep=Keep.TOP, mode=Mode.PRIVATE)
    with BuildSketch(Plane(origin=(11, 8, 0), x_dir=(0, 1, 0), z_dir=(-1, 0, 0))) as fillet_11_piece_8b_section:
        with BuildLine():
            CenterArc((4.582575695, -5), FILLET_11_R, 90, 66.421821522)
            Line((0, -3), (0, 0))
            Line((0, 0), (4.582575695, 0))
        make_face()
    fillet_11_piece_8b = extrude(amount=33.456439237, mode=Mode.PRIVATE)
    fillet_11_piece_8b = split(fillet_11_piece_8b, bisect_by=Plane(origin=(-11, 8, 0), z_dir=(-1, 0, 0)), keep=Keep.TOP, mode=Mode.PRIVATE)
    fillet_11_piece_8 = fillet_11_piece_8a & fillet_11_piece_8b
    add(fillet_11_piece_8)
    with BuildSketch(Plane(origin=(22.456439237, 8, 0), x_dir=(0, 1, 0), z_dir=(-1, 0, 0))) as fillet_11_piece_9a_section:
        with BuildLine():
            CenterArc((4.582575695, -5), FILLET_11_R, 90, 66.421821522)
            Line((0, -3), (0, 0))
            Line((0, 0), (4.582575695, 0))
        make_face()
    fillet_11_piece_9a = extrude(amount=33.456439237, mode=Mode.PRIVATE)
    fillet_11_piece_9a = split(fillet_11_piece_9a, bisect_by=Plane(origin=(11, 8, 0), z_dir=(1, 0, 0)), keep=Keep.TOP, mode=Mode.PRIVATE)
    with BuildSketch(Plane(origin=(11, -8, 0), x_dir=(1, 0, 0), z_dir=(0, 1, 0))) as fillet_11_piece_9b_section:
        with BuildLine():
            CenterArc((FILLET_11_R, -FILLET_11_R), FILLET_11_R, 90, 90)
            Line((0, -FILLET_11_R), (0, 0))
            Line((0, 0), (FILLET_11_R, 0))
        make_face()
    fillet_11_piece_9b = extrude(amount=28.5, mode=Mode.PRIVATE)
    fillet_11_piece_9b = split(fillet_11_piece_9b, bisect_by=Plane(origin=(11, 15.5, 0), z_dir=(0, -1, 0)), keep=Keep.TOP, mode=Mode.PRIVATE)
    fillet_11_piece_9b = split(fillet_11_piece_9b, bisect_by=Plane(origin=(11, 8, 0), z_dir=(0, 1, 0)), keep=Keep.TOP, mode=Mode.PRIVATE)
    fillet_11_piece_9b = split(fillet_11_piece_9b, bisect_by=Plane(origin=(11, -8, 3), z_dir=(0, 0, -1)), keep=Keep.TOP, mode=Mode.PRIVATE)
    fillet_11_piece_9 = fillet_11_piece_9a & fillet_11_piece_9b
    add(fillet_11_piece_9)

    # 圆角12
    # the kernel refuses this fillet: 5 mm, written as the material it adds along each edge
    with BuildSketch(Plane(origin=(-38, -24.5, -146.155644371), x_dir=(-0.9889307289952856, 0.14837794057356693, 0), z_dir=(0, 0, 1))) as fillet_12_piece_1_section:
        with BuildLine():
            CenterArc((4.341904206, 4.759181219), FILLET_12_R, 188.532937529, 63.612200039)
            Line((-0.602749439, 4.017291516), (-1.097214803, 3.943102546))
            Line((-1.097214803, 3.943102546), (-0.494465364, -0.07418897))
            Line((-0.494465364, -0.07418897), (0.07418897, -0.494465364))
            ThreePointArc((0.07418897, -0.494465364), (1.063119699, -0.346087424), (2.655566492, -0.475918122))
            Line((2.655566492, -0.475918122), (2.80886992, 0))
        make_face()
    fillet_12_piece_1 = extrude(amount=46.575462674, mode=Mode.PRIVATE)
    fillet_12_piece_1 = split(fillet_12_piece_1, bisect_by=Plane(origin=(-38, -21.515331006, -136.969777743), z_dir=(0, 0.3090169943749409, 0.9510565162951558)), keep=Keep.TOP, mode=Mode.PRIVATE)
    fillet_12_piece_1 = split(fillet_12_piece_1, bisect_by=Plane(origin=(-38, -35.203516045, -113.213609249), z_dir=(0, 0.3090169943749446, -0.9510565162951545)), keep=Keep.TOP, mode=Mode.PRIVATE)
    add(fillet_12_piece_1)

    # 圆角13
    # the kernel refuses this fillet: 5 mm, written as the material it adds along each edge
    with BuildSketch(Plane(origin=(38, -24.5, -146.155644371), x_dir=(0.9889307289952856, 0.14837794057356693, 0), z_dir=(0, 0, 1))) as fillet_13_piece_1_section:
        with BuildLine():
            CenterArc((4.341904206, -4.759181219), FILLET_13_R, 107.854862432, 63.612200039)
            Line((-0.602749439, -4.017291516), (-1.097214803, -3.943102546))
            Line((-1.097214803, -3.943102546), (-0.494465364, 0.07418897))
            Line((-0.494465364, 0.07418897), (0.07418897, 0.494465364))
            ThreePointArc((0.07418897, 0.494465364), (1.063119699, 0.346087424), (2.655566492, 0.475918122))
            Line((2.655566492, 0.475918122), (2.80886992, 0))
        make_face()
    fillet_13_piece_1 = extrude(amount=46.575462674, mode=Mode.PRIVATE)
    fillet_13_piece_1 = split(fillet_13_piece_1, bisect_by=Plane(origin=(38, -21.515331006, -136.969777743), z_dir=(0, 0.3090169943749409, 0.9510565162951558)), keep=Keep.TOP, mode=Mode.PRIVATE)
    fillet_13_piece_1 = split(fillet_13_piece_1, bisect_by=Plane(origin=(38, -35.203516045, -113.213609249), z_dir=(0, 0.3090169943749446, -0.9510565162951545)), keep=Keep.TOP, mode=Mode.PRIVATE)
    add(fillet_13_piece_1)

    # 草图9 → 切除-拉伸5 (cut, up to next)
    with BuildSketch(Plane(origin=(0, 0, -176), x_dir=(-1, 0, 0), z_dir=(0, 0, -1)), mode=Mode.PRIVATE) as cut_extrude_5_sk1:
        with Locations((0, 8)):
            Rectangle(SKETCH_9_W, SKETCH_9_H)
    cut_extrude_5_tool1 = extrude(cut_extrude_5_sk1.sketch, amount=-CUT_EXTRUDE_5_REACH, mode=Mode.PRIVATE) & part.part
    # 草图9 → 切除-拉伸5 (cut, up to next)
    with BuildSketch(Plane(origin=(0, 0, -176), x_dir=(-1, 0, 0), z_dir=(0, 0, -1)), mode=Mode.PRIVATE) as cut_extrude_5_sk2:
        Rectangle(SKETCH_9_W, SKETCH_9_H)
    cut_extrude_5_tool2 = extrude(cut_extrude_5_sk2.sketch, amount=-CUT_EXTRUDE_5_REACH, mode=Mode.PRIVATE) & part.part
    # 草图9 → 切除-拉伸5 (cut, up to next)
    with BuildSketch(Plane(origin=(0, 0, -176), x_dir=(-1, 0, 0), z_dir=(0, 0, -1)), mode=Mode.PRIVATE) as cut_extrude_5_sk3:
        with Locations((0, -8)):
            Rectangle(SKETCH_9_W, SKETCH_9_H)
    cut_extrude_5_tool3 = extrude(cut_extrude_5_sk3.sketch, amount=-CUT_EXTRUDE_5_REACH, mode=Mode.PRIVATE) & part.part
    add(cut_extrude_5_tool1.solids().sort_by_distance((0, 8, -176))[0], mode=Mode.SUBTRACT)
    add(cut_extrude_5_tool2.solids().sort_by_distance((0, 0, -176))[0], mode=Mode.SUBTRACT)
    add(cut_extrude_5_tool3.solids().sort_by_distance((0, -8, -176))[0], mode=Mode.SUBTRACT)


solid = part.part
